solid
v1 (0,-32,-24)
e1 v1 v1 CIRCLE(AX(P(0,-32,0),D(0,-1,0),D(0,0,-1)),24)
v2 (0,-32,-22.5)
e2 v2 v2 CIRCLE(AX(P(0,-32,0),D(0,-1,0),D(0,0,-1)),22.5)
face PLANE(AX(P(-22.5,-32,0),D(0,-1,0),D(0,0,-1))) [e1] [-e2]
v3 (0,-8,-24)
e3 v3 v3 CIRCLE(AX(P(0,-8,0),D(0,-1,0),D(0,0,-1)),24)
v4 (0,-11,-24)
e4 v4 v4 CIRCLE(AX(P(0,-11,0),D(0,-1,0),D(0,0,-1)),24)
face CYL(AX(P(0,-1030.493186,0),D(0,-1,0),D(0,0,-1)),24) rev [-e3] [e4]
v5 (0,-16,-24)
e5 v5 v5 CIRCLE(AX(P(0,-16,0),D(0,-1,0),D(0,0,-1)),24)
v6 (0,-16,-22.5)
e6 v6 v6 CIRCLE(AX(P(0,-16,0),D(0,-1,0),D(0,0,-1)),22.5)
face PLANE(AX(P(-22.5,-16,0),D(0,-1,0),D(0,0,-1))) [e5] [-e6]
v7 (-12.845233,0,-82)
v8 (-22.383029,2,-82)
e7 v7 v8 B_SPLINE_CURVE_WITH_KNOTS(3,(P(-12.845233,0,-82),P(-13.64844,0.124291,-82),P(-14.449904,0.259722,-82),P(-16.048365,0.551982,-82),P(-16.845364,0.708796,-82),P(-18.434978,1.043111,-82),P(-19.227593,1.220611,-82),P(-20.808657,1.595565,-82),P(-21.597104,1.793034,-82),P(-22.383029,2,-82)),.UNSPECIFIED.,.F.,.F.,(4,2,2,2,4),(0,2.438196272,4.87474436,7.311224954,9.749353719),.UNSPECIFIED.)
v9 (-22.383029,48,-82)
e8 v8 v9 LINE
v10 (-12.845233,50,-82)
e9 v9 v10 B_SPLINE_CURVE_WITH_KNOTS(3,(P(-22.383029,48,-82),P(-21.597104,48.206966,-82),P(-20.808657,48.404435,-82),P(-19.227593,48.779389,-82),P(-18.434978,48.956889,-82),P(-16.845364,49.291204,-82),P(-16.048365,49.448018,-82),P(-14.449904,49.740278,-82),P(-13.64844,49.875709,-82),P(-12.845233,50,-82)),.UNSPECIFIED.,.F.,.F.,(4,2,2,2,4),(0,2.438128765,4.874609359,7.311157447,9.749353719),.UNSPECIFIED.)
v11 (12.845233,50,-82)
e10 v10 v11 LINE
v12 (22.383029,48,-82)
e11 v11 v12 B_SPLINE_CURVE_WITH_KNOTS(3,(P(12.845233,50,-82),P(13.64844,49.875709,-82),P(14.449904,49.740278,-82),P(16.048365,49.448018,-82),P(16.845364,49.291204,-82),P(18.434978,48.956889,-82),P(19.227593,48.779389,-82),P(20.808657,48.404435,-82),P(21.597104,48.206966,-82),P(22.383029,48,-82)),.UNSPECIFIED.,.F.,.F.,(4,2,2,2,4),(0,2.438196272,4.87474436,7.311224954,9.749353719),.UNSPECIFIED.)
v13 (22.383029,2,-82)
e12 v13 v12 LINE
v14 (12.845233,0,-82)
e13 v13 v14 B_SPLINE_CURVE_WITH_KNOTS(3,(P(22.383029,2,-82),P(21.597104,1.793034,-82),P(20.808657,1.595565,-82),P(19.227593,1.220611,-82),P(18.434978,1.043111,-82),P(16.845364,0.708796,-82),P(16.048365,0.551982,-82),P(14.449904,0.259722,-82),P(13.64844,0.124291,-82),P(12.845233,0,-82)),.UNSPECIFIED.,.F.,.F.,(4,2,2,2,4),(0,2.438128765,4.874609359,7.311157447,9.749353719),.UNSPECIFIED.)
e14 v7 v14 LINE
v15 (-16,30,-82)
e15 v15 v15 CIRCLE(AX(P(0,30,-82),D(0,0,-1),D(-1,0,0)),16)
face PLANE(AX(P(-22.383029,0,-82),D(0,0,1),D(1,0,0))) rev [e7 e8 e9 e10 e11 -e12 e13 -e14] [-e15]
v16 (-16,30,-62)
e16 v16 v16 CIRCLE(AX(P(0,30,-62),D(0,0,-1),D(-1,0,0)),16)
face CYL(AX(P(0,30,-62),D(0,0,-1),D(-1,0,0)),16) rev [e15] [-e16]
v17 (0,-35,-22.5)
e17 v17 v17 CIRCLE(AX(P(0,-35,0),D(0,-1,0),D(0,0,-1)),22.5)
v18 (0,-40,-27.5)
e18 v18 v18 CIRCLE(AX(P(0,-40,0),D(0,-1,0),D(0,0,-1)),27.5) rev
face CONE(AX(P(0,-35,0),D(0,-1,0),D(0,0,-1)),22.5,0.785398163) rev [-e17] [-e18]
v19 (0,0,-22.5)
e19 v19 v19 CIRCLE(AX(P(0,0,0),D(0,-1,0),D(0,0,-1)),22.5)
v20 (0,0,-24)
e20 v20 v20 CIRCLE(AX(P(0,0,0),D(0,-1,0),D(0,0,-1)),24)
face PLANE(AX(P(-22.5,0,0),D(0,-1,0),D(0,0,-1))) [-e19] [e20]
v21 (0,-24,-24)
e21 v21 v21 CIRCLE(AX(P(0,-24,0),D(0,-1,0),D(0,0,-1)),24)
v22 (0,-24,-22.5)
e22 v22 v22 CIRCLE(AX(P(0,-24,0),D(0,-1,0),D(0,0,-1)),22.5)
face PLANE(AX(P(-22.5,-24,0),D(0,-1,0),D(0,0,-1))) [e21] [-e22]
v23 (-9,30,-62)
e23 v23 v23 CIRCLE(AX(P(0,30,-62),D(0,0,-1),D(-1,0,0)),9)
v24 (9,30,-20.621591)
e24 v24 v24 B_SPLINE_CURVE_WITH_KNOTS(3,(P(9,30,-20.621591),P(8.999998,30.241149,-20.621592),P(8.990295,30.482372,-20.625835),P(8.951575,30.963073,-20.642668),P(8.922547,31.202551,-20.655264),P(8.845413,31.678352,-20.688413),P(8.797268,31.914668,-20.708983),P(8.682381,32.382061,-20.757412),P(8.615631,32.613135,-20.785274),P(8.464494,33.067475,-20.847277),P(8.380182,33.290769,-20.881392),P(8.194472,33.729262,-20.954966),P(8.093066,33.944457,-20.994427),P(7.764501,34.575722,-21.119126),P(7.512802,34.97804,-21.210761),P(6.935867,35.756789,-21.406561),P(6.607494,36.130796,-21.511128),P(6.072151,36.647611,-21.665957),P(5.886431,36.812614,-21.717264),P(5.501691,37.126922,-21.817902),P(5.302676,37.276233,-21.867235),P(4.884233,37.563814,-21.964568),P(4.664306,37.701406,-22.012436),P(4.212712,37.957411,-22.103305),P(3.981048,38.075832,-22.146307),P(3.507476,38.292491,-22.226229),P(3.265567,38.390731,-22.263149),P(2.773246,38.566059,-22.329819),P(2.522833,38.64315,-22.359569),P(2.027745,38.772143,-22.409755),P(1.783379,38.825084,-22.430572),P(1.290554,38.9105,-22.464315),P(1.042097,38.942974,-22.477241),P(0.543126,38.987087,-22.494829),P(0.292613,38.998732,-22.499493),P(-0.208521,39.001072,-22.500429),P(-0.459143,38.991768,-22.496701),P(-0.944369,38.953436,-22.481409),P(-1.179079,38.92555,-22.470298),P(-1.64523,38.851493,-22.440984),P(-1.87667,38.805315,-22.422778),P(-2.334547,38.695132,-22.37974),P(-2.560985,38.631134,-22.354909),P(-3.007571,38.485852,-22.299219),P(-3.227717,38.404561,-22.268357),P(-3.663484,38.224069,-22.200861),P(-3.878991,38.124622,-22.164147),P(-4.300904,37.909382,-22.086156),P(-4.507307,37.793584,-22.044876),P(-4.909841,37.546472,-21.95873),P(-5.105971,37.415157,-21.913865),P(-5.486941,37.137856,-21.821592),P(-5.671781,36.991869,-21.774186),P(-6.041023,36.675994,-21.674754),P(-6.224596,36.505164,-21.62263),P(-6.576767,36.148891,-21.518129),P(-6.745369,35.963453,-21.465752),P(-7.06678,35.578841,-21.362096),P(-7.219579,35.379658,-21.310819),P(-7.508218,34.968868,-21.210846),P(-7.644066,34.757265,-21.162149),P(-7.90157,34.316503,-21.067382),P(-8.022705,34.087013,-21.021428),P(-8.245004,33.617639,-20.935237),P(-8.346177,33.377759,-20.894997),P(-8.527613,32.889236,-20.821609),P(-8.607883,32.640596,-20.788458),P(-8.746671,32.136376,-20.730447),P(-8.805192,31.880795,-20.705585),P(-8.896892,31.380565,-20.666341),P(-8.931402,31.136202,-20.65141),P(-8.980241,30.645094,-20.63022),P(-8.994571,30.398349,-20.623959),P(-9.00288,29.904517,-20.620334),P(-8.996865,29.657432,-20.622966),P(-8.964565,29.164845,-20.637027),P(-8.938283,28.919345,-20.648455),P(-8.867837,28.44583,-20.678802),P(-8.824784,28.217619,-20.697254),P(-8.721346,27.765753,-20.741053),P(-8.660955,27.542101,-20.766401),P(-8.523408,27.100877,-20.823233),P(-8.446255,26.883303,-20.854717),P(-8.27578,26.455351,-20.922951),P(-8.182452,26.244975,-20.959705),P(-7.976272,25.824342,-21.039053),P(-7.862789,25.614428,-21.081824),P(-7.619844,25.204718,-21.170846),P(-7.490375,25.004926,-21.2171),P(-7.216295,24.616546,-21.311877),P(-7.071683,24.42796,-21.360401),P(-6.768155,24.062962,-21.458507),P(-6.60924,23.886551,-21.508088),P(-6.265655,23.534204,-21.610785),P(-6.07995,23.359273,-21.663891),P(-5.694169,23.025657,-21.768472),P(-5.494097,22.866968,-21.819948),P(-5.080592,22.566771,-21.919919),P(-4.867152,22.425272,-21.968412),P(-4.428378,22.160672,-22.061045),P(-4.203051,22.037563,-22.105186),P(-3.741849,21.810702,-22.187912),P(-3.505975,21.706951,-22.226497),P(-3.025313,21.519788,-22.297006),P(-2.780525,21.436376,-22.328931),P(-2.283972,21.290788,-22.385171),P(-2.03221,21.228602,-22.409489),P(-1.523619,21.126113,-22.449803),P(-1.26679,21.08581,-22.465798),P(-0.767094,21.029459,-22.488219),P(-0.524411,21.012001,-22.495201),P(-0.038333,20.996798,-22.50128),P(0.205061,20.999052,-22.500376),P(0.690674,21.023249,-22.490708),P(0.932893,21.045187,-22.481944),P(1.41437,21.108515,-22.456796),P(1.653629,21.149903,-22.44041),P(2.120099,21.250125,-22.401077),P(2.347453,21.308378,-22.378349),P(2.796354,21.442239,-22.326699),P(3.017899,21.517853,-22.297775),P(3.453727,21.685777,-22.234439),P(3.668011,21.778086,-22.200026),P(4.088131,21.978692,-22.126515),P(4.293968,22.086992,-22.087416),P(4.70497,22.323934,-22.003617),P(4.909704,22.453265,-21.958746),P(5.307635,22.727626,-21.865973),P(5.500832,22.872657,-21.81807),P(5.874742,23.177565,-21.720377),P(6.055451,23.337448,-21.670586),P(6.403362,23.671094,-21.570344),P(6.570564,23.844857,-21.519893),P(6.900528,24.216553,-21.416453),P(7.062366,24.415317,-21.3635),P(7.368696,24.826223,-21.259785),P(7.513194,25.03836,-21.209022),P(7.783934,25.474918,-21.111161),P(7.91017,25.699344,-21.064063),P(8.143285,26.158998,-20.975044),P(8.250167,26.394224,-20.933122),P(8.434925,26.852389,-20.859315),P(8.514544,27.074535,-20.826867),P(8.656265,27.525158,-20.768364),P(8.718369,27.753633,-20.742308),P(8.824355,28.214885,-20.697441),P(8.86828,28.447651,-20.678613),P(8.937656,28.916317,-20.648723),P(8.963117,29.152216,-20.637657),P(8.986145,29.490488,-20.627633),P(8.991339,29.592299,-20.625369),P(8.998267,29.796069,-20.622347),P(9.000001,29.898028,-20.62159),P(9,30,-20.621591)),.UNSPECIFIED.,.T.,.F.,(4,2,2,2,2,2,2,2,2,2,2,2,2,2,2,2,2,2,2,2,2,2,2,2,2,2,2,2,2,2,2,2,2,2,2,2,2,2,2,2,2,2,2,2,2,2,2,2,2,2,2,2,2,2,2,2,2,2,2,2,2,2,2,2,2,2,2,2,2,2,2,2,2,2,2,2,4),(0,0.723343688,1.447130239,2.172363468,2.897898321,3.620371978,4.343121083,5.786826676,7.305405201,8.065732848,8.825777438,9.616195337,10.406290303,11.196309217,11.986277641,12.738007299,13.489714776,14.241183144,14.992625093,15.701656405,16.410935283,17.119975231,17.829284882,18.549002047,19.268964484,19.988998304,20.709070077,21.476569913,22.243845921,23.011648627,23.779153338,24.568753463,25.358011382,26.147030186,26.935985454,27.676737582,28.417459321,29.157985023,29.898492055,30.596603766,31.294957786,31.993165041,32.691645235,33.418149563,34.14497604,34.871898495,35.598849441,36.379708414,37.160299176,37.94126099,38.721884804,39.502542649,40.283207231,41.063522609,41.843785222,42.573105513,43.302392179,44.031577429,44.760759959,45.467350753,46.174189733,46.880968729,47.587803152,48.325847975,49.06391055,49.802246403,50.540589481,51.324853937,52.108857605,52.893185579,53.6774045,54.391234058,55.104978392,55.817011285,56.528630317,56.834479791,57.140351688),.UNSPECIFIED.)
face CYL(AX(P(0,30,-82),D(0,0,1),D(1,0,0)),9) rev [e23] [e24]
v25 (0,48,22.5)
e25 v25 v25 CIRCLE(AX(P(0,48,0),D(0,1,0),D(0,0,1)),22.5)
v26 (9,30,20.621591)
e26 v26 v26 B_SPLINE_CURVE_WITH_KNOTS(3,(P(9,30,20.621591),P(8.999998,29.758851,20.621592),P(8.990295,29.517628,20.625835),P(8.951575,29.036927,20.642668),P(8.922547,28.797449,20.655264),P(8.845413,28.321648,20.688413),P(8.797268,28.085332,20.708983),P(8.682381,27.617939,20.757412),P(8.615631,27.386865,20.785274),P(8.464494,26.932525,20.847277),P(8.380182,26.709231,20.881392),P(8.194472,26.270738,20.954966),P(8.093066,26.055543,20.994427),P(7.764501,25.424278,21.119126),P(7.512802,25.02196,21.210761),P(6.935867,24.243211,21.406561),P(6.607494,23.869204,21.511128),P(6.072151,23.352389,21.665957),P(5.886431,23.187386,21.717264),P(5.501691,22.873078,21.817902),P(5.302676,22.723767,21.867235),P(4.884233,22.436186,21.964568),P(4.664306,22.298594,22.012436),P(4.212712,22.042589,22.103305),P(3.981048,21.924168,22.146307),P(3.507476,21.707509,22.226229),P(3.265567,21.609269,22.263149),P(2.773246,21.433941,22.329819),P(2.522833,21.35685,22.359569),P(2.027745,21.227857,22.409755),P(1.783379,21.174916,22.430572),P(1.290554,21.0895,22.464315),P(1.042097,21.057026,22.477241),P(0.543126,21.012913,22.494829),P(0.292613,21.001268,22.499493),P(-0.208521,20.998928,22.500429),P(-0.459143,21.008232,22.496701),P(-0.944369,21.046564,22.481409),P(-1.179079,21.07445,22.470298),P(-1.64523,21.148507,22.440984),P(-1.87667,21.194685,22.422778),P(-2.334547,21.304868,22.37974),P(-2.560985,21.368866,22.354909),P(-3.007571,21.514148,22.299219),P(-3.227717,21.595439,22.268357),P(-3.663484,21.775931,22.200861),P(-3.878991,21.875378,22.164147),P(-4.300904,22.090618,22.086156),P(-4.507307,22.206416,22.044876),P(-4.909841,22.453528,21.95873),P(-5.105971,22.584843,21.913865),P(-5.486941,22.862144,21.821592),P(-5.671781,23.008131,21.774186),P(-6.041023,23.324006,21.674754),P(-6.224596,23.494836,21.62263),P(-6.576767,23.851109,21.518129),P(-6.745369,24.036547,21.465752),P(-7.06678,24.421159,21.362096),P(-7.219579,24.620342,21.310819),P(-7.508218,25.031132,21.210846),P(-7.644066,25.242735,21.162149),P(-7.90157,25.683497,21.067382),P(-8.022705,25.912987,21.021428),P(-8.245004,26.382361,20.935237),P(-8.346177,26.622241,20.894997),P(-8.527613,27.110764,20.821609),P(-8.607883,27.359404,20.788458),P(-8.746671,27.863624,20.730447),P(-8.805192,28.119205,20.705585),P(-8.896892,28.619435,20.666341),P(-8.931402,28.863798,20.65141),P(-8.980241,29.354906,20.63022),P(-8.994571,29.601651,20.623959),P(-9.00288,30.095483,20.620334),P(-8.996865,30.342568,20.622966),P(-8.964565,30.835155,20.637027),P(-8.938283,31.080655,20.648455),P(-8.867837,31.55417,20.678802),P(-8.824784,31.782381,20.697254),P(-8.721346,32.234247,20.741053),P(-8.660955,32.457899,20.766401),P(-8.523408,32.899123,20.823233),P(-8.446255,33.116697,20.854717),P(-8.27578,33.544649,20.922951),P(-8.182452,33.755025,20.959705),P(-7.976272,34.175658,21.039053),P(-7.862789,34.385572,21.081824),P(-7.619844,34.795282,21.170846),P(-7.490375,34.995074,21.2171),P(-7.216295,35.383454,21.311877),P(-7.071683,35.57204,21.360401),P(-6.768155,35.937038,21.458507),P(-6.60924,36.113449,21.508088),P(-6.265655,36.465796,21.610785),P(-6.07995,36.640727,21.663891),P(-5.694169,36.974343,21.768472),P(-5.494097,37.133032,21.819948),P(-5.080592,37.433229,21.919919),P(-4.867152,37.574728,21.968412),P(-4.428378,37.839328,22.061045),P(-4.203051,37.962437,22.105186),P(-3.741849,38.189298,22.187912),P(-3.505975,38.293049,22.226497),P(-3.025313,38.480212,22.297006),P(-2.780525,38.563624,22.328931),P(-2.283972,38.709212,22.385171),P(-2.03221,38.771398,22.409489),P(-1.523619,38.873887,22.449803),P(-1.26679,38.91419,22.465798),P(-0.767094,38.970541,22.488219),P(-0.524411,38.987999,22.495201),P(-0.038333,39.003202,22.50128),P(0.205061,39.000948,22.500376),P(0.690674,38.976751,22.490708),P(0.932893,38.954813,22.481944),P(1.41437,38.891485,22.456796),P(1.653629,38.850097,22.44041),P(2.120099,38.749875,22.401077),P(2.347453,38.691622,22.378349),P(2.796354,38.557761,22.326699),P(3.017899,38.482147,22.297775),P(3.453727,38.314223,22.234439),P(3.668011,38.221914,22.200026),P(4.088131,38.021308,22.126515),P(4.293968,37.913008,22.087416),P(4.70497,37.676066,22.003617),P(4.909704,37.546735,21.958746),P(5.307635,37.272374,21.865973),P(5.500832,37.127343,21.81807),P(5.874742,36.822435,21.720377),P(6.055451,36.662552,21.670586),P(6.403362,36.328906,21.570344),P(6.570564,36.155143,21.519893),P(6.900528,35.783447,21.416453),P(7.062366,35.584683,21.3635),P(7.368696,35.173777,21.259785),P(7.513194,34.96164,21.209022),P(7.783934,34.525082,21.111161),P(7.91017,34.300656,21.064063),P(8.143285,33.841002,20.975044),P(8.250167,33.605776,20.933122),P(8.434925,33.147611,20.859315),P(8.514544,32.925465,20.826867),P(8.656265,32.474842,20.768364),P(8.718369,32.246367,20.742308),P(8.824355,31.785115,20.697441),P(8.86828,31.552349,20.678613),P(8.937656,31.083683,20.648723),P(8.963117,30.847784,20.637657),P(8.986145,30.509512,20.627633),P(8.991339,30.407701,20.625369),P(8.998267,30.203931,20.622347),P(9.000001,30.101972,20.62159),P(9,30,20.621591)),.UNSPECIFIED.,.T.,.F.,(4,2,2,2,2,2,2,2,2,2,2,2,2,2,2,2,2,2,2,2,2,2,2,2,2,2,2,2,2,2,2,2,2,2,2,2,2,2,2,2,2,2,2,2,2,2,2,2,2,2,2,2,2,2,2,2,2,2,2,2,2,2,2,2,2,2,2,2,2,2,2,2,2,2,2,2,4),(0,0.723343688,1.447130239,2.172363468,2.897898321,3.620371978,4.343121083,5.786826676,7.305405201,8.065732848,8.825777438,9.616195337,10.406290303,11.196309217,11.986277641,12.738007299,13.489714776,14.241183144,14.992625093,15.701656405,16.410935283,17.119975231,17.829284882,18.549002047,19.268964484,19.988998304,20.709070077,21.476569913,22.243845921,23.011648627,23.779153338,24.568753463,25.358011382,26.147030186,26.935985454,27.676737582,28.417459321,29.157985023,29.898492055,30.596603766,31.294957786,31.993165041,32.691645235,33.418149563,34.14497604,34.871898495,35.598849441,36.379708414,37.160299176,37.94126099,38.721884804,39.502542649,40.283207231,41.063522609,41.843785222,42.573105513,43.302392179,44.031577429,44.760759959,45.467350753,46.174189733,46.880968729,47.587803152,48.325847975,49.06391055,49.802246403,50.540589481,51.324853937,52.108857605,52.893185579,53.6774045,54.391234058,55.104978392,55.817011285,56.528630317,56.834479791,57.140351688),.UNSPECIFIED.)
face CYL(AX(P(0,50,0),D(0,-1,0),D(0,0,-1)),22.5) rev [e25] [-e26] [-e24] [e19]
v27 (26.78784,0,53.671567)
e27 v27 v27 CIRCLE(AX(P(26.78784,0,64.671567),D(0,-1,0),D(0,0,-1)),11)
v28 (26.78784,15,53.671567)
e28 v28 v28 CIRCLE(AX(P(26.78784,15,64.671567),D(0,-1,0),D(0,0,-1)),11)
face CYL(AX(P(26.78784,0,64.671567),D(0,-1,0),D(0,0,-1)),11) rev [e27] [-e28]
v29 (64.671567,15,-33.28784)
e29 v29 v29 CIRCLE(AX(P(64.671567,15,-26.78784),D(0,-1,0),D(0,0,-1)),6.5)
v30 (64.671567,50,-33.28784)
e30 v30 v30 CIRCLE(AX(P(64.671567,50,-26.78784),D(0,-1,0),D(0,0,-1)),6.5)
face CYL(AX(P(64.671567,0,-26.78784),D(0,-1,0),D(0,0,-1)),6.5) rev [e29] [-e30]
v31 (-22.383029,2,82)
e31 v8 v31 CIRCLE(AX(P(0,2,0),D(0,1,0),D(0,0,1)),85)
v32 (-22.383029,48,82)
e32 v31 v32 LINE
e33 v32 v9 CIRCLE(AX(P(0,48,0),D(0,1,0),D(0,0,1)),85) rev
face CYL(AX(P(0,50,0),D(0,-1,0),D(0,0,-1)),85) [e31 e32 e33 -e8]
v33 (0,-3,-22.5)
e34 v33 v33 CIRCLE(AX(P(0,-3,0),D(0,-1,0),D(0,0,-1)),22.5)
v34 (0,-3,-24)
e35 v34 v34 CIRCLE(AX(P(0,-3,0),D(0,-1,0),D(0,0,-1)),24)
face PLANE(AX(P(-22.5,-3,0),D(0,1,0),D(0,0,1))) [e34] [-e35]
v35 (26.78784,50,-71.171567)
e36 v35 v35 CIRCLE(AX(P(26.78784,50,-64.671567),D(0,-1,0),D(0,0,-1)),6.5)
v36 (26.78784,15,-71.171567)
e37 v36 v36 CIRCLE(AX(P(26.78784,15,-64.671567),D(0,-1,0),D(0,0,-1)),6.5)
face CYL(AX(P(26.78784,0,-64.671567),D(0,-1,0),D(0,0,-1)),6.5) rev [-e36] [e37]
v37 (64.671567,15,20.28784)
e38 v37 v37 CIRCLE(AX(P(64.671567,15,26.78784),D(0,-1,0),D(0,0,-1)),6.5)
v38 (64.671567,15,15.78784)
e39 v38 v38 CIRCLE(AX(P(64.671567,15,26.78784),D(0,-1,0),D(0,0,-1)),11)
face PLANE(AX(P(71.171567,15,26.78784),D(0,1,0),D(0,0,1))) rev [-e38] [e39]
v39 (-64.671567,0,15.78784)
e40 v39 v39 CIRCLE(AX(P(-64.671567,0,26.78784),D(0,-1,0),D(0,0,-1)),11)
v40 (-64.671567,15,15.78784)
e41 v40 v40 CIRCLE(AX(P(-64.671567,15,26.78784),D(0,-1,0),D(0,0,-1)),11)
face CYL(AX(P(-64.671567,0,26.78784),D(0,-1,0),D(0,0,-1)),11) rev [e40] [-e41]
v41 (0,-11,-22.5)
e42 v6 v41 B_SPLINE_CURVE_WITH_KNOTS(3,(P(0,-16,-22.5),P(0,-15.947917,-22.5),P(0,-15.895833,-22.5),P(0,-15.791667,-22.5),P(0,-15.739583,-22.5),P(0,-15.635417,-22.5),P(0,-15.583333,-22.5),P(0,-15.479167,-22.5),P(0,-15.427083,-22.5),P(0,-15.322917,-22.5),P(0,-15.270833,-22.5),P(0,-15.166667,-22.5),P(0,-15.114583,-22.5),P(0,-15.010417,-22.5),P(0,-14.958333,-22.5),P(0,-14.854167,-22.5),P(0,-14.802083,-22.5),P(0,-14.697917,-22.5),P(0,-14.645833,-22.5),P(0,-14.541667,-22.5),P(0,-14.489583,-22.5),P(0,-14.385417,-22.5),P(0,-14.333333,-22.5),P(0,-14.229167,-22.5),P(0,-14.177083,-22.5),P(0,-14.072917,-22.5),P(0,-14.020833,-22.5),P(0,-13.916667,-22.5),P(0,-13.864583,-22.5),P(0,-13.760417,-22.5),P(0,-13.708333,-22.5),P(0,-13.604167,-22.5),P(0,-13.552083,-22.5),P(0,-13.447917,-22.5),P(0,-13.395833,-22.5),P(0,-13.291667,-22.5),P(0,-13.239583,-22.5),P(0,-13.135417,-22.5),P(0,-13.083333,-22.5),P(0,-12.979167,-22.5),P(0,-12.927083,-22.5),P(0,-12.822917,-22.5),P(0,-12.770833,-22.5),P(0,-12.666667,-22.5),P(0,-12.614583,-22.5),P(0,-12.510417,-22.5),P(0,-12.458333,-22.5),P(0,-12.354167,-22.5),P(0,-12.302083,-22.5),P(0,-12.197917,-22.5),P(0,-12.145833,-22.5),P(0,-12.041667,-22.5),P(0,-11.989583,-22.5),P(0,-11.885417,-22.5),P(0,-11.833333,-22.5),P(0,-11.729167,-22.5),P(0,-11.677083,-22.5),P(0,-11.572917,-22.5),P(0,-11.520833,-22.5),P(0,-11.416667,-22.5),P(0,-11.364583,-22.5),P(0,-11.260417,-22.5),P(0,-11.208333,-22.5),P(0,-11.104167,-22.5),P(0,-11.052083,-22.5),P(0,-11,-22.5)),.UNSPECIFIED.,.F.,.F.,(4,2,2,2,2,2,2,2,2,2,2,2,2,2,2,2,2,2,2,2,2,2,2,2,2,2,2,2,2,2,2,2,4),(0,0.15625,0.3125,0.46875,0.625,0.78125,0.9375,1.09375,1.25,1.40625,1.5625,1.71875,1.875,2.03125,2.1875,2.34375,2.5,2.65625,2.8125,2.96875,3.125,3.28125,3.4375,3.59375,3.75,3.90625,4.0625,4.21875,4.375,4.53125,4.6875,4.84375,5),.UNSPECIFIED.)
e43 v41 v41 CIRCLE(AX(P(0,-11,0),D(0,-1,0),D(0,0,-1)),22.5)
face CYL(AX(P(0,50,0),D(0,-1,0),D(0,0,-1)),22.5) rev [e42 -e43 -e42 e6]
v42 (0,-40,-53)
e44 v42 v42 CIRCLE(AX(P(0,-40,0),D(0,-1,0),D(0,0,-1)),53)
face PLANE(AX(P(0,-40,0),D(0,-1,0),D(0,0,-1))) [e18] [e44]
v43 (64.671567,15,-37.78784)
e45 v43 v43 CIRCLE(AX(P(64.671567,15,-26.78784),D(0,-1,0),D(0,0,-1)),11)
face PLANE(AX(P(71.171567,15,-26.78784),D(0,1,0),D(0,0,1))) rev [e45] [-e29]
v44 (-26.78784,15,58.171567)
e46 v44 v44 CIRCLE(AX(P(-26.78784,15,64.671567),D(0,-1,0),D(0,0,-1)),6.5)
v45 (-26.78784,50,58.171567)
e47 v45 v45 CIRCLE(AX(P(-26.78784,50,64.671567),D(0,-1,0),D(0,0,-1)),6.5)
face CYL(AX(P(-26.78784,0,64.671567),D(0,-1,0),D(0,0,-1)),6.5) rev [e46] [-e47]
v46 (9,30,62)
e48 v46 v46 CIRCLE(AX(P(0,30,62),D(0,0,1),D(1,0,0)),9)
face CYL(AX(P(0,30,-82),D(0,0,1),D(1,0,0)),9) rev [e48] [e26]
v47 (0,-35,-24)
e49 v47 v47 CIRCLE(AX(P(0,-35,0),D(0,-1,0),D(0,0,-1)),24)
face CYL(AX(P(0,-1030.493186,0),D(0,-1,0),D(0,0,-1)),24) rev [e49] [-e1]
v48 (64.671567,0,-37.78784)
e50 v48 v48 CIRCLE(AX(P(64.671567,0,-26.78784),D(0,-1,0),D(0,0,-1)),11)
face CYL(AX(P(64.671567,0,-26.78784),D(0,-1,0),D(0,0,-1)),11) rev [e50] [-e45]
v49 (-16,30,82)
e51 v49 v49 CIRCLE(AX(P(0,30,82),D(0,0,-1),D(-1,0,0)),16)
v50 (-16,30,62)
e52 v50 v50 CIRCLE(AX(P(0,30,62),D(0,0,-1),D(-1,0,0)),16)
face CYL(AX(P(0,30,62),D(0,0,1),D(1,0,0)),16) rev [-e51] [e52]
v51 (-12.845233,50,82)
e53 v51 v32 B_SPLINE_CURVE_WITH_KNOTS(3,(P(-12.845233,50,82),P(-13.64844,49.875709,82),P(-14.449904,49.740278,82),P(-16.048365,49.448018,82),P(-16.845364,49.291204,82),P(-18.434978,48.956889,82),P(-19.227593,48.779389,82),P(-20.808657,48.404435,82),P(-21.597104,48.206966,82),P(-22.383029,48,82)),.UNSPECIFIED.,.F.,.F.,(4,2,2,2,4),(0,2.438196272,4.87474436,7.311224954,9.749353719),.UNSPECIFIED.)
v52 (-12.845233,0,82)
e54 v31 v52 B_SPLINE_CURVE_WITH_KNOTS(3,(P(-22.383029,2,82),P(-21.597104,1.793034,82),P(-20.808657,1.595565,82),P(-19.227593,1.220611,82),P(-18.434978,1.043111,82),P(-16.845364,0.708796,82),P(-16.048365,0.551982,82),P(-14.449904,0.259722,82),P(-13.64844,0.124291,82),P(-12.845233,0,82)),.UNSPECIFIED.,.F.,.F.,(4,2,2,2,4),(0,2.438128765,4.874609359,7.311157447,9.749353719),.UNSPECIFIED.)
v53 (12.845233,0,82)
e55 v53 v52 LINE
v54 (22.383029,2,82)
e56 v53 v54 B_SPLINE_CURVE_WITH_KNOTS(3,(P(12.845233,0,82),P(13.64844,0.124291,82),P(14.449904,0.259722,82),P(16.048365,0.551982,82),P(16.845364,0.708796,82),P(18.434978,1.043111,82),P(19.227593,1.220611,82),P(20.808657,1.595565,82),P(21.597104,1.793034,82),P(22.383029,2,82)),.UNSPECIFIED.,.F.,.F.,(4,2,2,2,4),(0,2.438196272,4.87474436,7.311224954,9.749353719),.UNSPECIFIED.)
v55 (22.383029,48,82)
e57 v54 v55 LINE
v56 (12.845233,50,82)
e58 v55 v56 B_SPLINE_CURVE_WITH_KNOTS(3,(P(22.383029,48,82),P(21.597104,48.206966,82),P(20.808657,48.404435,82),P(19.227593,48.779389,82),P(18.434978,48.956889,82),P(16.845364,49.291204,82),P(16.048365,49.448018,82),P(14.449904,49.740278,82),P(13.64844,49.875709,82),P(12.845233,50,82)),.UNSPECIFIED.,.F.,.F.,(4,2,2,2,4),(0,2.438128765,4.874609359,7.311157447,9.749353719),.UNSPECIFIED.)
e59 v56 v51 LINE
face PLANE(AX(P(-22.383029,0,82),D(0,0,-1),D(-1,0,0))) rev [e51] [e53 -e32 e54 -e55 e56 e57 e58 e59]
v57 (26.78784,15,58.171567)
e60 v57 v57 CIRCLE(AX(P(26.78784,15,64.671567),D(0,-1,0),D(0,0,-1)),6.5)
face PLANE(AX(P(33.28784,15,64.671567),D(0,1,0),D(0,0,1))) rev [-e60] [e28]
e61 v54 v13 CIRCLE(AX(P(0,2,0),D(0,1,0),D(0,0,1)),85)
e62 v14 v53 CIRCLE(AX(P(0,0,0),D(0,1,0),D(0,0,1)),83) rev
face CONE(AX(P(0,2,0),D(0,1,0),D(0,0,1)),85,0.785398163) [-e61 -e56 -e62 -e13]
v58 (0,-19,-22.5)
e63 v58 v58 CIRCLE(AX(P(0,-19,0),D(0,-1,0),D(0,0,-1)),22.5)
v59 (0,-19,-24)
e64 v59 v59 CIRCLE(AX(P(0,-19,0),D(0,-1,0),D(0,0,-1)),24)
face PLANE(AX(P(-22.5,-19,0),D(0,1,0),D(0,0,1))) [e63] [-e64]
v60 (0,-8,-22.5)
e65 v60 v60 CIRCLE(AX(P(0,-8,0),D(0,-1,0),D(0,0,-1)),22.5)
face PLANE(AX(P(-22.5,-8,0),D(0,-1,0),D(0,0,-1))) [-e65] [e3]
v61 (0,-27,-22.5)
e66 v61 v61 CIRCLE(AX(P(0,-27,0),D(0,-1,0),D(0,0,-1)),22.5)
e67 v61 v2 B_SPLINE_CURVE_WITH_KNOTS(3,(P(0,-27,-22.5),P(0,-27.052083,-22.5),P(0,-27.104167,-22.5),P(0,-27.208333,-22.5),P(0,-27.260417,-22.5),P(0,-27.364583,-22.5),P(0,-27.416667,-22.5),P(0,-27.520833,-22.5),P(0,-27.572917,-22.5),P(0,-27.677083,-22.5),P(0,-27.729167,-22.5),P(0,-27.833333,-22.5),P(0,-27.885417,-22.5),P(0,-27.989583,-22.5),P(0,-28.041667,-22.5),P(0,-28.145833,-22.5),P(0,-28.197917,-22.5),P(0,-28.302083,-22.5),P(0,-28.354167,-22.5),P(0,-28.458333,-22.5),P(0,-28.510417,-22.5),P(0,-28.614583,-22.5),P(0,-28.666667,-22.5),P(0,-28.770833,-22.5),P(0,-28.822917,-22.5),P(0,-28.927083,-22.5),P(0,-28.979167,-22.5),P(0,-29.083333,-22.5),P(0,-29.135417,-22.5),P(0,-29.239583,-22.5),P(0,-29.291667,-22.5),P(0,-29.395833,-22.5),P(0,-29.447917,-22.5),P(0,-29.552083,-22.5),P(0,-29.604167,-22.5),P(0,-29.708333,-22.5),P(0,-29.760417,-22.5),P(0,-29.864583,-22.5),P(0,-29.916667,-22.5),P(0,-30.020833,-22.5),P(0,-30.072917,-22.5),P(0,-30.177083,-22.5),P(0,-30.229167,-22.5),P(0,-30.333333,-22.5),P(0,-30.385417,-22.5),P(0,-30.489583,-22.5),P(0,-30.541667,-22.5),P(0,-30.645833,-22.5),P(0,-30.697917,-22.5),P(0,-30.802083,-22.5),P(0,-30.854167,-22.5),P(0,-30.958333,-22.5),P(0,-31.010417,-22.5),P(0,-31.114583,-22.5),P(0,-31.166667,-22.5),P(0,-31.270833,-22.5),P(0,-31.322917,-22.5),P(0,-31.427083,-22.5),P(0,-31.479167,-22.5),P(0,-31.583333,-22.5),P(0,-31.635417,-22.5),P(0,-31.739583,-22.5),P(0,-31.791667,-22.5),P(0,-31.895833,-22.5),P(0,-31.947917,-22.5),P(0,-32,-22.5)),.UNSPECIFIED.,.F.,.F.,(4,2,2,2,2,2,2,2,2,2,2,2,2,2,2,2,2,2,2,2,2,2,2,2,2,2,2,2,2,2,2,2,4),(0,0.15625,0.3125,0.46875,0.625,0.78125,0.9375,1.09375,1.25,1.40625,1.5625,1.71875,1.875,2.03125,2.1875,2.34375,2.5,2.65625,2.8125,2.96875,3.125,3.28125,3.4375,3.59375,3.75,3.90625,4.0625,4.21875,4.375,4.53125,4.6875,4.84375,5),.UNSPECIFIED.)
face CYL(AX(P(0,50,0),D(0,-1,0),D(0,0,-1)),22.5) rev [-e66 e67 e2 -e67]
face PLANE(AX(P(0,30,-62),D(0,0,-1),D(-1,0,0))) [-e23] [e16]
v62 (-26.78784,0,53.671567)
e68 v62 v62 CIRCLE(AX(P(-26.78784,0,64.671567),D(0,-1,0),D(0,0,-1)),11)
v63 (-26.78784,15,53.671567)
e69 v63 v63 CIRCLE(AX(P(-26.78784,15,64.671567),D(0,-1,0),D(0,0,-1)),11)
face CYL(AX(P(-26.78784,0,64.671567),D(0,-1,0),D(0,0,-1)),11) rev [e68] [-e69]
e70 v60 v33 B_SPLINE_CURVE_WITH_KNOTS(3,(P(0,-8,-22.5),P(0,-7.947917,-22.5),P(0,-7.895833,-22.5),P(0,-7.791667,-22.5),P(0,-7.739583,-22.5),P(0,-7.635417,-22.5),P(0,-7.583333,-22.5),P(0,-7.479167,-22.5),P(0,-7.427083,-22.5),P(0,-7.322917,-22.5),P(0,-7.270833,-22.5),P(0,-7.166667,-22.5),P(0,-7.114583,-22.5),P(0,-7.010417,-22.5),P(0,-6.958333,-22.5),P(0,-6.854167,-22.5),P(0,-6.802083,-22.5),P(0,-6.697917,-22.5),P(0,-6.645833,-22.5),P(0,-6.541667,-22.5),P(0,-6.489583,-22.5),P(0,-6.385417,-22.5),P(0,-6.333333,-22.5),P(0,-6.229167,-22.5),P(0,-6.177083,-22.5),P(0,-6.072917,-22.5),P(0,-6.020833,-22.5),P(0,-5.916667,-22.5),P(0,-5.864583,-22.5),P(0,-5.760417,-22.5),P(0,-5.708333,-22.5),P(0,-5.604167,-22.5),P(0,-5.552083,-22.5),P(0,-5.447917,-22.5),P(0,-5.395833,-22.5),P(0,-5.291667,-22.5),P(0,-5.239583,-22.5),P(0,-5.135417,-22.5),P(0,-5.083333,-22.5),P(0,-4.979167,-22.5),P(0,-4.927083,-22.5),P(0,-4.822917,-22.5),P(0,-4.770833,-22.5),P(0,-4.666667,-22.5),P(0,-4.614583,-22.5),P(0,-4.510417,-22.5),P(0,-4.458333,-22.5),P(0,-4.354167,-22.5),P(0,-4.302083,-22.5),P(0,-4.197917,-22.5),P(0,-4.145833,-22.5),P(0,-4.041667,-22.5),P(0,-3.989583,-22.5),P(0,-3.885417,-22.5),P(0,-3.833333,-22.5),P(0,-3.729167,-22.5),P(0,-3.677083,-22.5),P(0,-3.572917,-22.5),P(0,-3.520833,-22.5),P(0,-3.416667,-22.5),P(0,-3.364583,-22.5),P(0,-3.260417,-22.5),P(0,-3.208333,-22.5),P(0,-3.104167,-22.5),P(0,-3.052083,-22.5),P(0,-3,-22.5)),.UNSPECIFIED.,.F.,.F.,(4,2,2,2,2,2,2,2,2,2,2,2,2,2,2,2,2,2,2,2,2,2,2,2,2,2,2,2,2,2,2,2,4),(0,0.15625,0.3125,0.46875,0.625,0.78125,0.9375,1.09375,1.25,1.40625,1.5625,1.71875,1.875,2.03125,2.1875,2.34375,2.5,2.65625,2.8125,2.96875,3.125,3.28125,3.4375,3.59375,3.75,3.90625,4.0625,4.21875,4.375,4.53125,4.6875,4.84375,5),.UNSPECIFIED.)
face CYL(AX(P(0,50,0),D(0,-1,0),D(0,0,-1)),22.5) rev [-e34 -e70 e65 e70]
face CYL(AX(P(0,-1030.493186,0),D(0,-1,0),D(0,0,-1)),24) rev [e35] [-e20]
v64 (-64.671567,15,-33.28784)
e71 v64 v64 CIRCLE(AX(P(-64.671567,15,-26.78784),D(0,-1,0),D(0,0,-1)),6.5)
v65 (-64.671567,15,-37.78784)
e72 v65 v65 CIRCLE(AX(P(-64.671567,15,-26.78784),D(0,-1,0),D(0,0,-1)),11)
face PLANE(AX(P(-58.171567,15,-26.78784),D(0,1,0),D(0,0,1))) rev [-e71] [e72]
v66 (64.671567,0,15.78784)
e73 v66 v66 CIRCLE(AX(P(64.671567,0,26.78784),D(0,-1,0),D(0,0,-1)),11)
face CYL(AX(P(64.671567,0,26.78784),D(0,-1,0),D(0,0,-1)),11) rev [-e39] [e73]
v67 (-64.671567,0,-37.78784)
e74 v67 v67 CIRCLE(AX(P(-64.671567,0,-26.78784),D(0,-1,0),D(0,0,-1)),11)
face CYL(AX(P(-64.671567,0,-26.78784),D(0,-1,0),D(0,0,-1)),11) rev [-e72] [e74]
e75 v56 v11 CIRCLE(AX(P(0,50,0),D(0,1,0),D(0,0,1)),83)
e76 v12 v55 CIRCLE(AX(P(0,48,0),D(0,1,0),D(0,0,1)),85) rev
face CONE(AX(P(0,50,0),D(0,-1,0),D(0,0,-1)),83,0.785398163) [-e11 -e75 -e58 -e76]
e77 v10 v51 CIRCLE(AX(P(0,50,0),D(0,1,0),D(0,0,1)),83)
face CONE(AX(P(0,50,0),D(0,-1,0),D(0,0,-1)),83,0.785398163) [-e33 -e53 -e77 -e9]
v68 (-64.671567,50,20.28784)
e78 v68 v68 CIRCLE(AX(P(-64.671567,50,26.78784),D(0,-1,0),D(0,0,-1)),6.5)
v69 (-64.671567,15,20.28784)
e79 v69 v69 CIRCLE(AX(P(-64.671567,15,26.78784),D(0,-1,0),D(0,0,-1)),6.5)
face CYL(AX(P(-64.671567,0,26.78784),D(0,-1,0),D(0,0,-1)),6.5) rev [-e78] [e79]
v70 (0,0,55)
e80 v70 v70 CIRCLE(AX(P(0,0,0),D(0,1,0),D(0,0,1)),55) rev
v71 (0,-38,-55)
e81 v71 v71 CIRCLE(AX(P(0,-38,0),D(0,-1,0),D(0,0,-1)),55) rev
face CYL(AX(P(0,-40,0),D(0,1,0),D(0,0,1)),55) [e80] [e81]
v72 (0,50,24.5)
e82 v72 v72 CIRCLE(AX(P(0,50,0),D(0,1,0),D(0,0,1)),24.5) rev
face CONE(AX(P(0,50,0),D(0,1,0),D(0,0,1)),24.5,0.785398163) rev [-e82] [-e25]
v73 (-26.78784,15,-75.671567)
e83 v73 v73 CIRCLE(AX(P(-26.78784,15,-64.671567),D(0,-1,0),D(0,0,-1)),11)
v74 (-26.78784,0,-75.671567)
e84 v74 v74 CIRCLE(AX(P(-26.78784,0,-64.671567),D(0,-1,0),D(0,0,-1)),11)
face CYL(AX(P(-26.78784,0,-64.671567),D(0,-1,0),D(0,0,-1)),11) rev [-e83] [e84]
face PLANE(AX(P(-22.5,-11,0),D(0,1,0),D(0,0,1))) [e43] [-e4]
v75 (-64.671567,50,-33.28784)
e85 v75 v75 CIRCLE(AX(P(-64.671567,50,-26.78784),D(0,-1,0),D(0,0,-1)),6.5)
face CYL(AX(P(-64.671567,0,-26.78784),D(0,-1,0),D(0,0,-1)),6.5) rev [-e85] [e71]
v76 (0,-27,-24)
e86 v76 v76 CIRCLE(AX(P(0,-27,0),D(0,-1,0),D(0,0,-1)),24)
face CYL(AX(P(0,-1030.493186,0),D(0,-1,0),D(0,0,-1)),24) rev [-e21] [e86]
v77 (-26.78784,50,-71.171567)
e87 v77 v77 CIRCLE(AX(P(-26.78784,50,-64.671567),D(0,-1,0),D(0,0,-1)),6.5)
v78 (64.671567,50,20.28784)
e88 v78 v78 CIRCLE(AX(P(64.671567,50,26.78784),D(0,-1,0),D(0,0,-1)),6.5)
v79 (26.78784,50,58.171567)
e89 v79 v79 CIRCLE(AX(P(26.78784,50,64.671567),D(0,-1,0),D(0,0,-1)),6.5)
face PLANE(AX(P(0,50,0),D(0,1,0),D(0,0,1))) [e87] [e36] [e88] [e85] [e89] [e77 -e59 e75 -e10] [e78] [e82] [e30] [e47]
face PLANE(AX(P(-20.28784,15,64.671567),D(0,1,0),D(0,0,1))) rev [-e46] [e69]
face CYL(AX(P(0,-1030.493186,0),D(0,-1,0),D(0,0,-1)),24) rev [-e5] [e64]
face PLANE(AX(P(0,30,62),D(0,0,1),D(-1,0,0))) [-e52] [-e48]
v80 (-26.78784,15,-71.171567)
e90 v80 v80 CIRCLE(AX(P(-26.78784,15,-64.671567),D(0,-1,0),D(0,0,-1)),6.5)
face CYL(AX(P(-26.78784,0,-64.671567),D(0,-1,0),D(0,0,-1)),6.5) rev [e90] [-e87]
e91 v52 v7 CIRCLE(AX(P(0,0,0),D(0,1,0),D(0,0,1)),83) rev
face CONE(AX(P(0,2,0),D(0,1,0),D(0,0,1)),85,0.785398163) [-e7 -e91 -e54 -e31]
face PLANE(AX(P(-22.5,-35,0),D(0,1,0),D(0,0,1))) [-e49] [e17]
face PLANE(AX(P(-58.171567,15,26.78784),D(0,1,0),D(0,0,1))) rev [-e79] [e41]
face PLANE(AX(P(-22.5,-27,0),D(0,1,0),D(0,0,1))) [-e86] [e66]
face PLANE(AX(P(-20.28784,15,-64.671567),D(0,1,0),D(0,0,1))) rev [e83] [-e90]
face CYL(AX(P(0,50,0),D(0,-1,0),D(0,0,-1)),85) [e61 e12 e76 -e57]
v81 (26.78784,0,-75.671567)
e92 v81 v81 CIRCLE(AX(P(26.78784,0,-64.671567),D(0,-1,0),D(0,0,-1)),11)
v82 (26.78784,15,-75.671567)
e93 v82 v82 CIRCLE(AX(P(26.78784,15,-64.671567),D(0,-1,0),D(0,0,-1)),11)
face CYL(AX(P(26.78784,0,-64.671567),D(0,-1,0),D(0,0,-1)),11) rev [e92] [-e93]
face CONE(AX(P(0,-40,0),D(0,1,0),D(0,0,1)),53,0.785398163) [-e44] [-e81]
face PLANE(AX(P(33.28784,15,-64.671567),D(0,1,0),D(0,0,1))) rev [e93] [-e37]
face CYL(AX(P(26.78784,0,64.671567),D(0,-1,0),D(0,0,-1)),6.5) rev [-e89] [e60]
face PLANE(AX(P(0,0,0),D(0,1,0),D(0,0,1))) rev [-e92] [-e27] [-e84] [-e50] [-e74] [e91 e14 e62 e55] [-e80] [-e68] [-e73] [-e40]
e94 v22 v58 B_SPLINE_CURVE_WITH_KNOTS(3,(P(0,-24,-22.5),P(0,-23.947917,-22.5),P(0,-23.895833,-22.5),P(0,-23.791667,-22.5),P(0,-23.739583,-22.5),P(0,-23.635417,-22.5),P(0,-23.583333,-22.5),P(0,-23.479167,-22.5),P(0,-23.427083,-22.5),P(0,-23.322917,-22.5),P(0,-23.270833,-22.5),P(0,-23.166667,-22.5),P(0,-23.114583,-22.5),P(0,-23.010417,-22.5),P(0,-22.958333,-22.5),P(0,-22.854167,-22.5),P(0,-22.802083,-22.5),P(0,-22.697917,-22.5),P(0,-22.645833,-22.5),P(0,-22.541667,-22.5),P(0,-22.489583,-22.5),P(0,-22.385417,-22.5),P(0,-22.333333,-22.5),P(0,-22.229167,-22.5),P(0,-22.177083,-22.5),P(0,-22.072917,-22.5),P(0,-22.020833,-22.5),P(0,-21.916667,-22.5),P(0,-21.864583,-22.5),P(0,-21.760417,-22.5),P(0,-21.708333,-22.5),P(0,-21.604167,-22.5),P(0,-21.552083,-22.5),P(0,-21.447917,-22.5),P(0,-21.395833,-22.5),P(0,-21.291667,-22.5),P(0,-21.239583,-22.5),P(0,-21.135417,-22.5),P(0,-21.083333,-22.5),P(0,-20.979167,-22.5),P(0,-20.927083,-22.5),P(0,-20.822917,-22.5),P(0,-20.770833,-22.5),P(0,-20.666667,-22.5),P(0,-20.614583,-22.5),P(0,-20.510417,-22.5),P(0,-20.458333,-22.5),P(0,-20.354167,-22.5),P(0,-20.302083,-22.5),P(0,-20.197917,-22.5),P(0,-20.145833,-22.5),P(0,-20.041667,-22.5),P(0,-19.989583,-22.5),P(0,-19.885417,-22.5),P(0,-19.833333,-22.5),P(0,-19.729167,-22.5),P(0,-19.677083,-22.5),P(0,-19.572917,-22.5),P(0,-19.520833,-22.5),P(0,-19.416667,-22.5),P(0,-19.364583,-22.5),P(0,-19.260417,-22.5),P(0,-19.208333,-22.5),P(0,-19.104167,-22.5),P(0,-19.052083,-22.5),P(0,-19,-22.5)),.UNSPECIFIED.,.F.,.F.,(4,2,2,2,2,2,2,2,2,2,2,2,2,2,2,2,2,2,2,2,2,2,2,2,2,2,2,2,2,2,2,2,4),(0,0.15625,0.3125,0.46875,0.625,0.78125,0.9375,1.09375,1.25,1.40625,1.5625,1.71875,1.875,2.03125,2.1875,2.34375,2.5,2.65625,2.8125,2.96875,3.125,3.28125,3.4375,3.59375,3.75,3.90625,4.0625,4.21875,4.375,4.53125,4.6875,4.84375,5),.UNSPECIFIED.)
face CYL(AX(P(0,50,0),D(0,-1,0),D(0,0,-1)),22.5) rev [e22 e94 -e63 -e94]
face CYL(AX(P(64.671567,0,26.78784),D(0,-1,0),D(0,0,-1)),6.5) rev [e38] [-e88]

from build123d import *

# Parameters (mm, degrees)
SKETCH_1_R                    = 85
EXTRUDE_1_DEPTH               = 50
HOLE_WIZARD_M12_1_D           = 13
HOLE_WIZARD_M12_1_CBORE_D     = 22
HOLE_WIZARD_M12_1_CBORE_DEPTH = 15
PATTERN_CIRCULAR_1_COUNT      = 8
SKETCH_6_W                    = 44.766058572
SKETCH_6_H                    = 9.083836387
SKETCH_6_H_2                  = 8.147377862
CUT_EXTRUDE_1_DEPTH           = 131.192165663
SKETCH_7_R                    = 16
CUT_EXTRUDE_2_DEPTH           = 20
SKETCH_8_R                    = 9
CUT_EXTRUDE_3_DEPTH           = 175.530799574
CHAMFER_1_SIZE                = 2
SKETCH_9_R                    = 55
EXTRUDE_2_DEPTH               = 40
SKETCH_10_R                   = 22.5
CUT_EXTRUDE_4_DEPTH           = 149.489056836
SKETCH_11_W                   = 1.5
SKETCH_11_H                   = 3
CHAMFER_2_SIZE                = 5
CHAMFER_3_SIZE                = 2
CHAMFER_4_SIZE                = 2


with BuildPart() as part:
    # 草圖1 → 填料-伸長1 (new body)
    with BuildSketch(Plane(origin=(0, 0, 0), x_dir=(1, 0, 0), z_dir=(0, 1, 0))):
        with Locations(Location((0, 0, 0), (0, 0, 270))):
            Circle(SKETCH_1_R)
    extrude(amount=EXTRUDE_1_DEPTH)

    # M12 六角頭螺栓的柱孔1 (through all)
    with Locations(Plane.XZ):
        with Locations((-64.671567276, 26.787840266)):
            hole_wizard_m12_1 = CounterBoreHole(HOLE_WIZARD_M12_1_D / 2, HOLE_WIZARD_M12_1_CBORE_D / 2, HOLE_WIZARD_M12_1_CBORE_DEPTH)

    # 環狀複製排列1: M12 六角頭螺栓的柱孔1 ×8 about axis
    pattern_circular_1_axis = Axis((0, 0, 0), (0, 1, 0))
    for i in range(1, PATTERN_CIRCULAR_1_COUNT):
        add(hole_wizard_m12_1.rotate(pattern_circular_1_axis, i * 360 / PATTERN_CIRCULAR_1_COUNT), mode=Mode.SUBTRACT)

    # 草圖6 → 除料-伸長1 (cut, through all)
    with BuildSketch(Plane(origin=(0, 50, 0), x_dir=(1, 0, 0), z_dir=(0, 1, 0))):
        with Locations((0, 86.541918194)):
            Rectangle(SKETCH_6_W, SKETCH_6_H)
        with Locations((0, -86.073688931)):
            Rectangle(SKETCH_6_W, SKETCH_6_H_2)
    extrude(amount=-CUT_EXTRUDE_1_DEPTH, mode=Mode.SUBTRACT)

    # 草圖7 → 除料-伸長2 (cut)
    with BuildSketch(Plane(origin=(0, 0, -82), x_dir=(-1, 0, 0), z_dir=(0, 0, -1))):
        with Locations((0, 30)):
            Circle(SKETCH_7_R)
    cut_extrude_2 = extrude(amount=-CUT_EXTRUDE_2_DEPTH, mode=Mode.SUBTRACT)

    # 鏡射1: 除料-伸長2 across plane
    add(cut_extrude_2.mirror(Plane.XY), mode=Mode.SUBTRACT)

    # 草圖8 → 除料-伸長3 (cut, through all)
    with BuildSketch(Plane.XY.offset(62)):
        with Locations((0, 30)):
            Circle(SKETCH_8_R)
    extrude(amount=-CUT_EXTRUDE_3_DEPTH, mode=Mode.SUBTRACT)

    # 導角1
    chamfer_1_edges = [part.edges().sort_by_distance(p)[0] for p in [
        (-85, 50, 0),
        (-85, 0, 0),
        (85, 50, 0),
        (85, 0, 0),
    ]]
    chamfer(chamfer_1_edges, length=CHAMFER_1_SIZE)

    # 草圖9 → 填料-伸長2 (add)
    with BuildSketch(Plane.XZ):
        with Locations(Location((0, 0, 0), (0, 0, 90))):
            Circle(SKETCH_9_R)
    extrude(amount=EXTRUDE_2_DEPTH)

    # 草圖10 → 除料-伸長4 (cut, through all)
    with BuildSketch(Plane.XZ.offset(40)):
        with Locations(Location((0, 0, 0), (0, 0, 270))):
            Circle(SKETCH_10_R)
    extrude(amount=-CUT_EXTRUDE_4_DEPTH, mode=Mode.SUBTRACT)

    # 草圖11 → 除料-旋轉1 (revolve, cut)
    with BuildSketch(Plane.XY, mode=Mode.PRIVATE) as cut_revolve_1_sk:
        with Locations((-23.25, -25.5)):
            Rectangle(SKETCH_11_W, SKETCH_11_H)
        with Locations((-23.25, -17.5)):
            Rectangle(SKETCH_11_W, SKETCH_11_H)
        with Locations((-23.25, -33.5)):
            Rectangle(SKETCH_11_W, SKETCH_11_H)
        with Locations((-23.25, -9.5)):
            Rectangle(SKETCH_11_W, SKETCH_11_H)
        with Locations((-23.25, -1.5)):
            Rectangle(SKETCH_11_W, SKETCH_11_H)
    revolve(cut_revolve_1_sk.sketch.rotate(Axis((0, -1030.493185966, 0), (0, 1, 0)), 270), axis=Axis((0, -1030.493185966, 0), (0, 1, 0)), mode=Mode.SUBTRACT)

    # 導角2
    chamfer_2_edges = [part.edges().sort_by_distance(p)[0] for p in [
        (0, -40, 22.5),
    ]]
    chamfer(chamfer_2_edges, length=CHAMFER_2_SIZE - 0.0001)  # a hair under: the kernel refuses the full size

    # 導角3
    chamfer_3_edges = [part.edges().sort_by_distance(p)[0] for p in [
        (0, -40, -55),
    ]]
    chamfer(chamfer_3_edges, length=CHAMFER_3_SIZE)

    # 導角4
    chamfer_4_edges = [part.edges().sort_by_distance(p)[0] for p in [
        (0, 50, 22.5),
    ]]
    chamfer(chamfer_4_edges, length=CHAMFER_4_SIZE)


solid = part.part
